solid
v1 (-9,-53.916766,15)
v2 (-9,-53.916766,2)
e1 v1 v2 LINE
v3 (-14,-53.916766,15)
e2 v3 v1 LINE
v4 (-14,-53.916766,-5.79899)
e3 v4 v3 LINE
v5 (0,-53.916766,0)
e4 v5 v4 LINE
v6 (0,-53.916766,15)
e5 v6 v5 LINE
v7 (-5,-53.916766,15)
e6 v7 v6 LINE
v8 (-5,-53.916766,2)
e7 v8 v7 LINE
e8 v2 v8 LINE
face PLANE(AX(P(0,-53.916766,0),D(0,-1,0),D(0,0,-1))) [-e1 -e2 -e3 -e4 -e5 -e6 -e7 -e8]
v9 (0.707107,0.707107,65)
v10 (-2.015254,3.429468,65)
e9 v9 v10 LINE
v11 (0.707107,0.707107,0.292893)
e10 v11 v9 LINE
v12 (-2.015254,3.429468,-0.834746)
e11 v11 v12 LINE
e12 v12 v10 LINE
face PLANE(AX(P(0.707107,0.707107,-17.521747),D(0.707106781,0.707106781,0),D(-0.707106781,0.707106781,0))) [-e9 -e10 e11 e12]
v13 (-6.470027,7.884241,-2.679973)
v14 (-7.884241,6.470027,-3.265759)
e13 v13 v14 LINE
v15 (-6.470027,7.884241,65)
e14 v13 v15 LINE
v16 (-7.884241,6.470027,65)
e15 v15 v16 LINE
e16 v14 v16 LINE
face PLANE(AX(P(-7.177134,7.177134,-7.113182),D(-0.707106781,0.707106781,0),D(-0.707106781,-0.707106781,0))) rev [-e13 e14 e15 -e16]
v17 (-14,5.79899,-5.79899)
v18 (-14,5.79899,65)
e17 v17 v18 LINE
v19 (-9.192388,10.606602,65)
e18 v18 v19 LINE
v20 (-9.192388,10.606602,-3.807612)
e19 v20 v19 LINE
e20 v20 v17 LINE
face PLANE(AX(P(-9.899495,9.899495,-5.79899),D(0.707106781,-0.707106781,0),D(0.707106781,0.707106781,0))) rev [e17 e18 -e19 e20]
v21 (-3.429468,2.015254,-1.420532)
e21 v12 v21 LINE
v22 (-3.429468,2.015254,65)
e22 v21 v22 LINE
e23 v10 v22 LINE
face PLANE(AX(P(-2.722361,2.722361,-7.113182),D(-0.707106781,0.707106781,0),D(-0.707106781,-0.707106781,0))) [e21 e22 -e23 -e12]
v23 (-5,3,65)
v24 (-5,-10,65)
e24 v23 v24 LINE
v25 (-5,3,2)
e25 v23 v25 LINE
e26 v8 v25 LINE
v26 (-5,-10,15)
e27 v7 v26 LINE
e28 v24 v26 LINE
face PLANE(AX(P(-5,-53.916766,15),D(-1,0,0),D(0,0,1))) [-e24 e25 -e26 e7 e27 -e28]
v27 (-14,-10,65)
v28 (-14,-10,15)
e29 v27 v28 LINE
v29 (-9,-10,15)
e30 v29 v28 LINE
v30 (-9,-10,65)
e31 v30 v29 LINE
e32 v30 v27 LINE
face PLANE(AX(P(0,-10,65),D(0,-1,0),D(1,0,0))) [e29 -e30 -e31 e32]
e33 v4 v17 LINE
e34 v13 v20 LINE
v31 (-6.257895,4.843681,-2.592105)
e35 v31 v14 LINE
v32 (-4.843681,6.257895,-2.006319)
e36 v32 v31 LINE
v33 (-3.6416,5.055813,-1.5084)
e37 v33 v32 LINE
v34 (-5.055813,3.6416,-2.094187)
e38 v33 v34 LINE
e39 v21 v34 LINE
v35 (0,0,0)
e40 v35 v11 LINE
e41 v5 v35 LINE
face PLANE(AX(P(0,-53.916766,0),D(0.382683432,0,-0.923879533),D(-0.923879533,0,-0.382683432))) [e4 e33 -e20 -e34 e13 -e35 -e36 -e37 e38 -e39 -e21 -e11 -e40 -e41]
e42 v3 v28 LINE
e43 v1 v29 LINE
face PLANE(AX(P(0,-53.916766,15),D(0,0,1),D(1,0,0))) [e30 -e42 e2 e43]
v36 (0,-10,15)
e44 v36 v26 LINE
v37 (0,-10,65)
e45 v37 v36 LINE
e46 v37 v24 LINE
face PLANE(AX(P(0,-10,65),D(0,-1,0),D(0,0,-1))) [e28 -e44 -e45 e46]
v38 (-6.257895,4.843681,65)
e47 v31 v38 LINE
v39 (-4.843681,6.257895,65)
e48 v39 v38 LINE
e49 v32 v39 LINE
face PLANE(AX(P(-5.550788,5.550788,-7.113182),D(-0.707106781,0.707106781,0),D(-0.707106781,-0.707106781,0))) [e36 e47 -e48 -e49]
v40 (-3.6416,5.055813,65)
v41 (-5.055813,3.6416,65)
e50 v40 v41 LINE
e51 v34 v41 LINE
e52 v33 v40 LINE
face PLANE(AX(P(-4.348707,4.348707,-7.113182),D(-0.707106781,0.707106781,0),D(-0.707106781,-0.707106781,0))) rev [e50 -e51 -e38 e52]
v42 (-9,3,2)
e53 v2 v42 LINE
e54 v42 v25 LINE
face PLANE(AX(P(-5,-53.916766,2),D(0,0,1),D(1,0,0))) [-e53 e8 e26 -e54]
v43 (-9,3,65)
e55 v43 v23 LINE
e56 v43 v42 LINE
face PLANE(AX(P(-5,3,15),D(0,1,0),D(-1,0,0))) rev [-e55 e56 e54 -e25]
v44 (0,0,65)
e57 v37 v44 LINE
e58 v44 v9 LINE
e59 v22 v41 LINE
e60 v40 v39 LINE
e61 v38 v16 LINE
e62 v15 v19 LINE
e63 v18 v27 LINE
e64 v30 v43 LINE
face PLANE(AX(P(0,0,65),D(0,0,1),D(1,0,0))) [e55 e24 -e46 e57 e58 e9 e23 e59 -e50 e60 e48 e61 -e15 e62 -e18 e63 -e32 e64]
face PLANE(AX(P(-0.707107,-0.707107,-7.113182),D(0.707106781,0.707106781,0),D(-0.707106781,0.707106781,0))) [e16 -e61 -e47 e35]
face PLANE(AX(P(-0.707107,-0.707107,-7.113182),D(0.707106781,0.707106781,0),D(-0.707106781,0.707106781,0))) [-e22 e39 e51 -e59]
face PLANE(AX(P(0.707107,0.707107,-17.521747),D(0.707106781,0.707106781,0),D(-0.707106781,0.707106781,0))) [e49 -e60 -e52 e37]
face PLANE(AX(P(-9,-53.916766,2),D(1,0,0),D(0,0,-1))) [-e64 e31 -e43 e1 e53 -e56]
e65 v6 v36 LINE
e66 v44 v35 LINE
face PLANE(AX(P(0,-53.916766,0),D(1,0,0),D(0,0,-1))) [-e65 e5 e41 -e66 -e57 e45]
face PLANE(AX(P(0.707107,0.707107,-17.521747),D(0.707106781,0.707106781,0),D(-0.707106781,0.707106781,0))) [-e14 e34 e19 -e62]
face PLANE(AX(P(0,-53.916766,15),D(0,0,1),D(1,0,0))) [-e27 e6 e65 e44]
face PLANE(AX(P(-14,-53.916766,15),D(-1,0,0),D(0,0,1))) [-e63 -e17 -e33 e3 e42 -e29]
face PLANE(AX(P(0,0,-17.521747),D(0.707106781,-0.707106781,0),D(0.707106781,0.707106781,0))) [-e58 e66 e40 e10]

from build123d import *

# Parameters (mm, degrees)
BOSS_EXTRUDE2_START       = -53.9167663
BOSS_EXTRUDE2_DEPTH       = 53.9167663
BOSS_EXTRUDE2_START_2     = -5.234980118
BOSS_EXTRUDE2_2_DEPTH     = 20.234980118
BOSS_EXTRUDE2_START_3     = -5.798989873
BOSS_EXTRUDE2_3_DEPTH     = 2.136888219
BOSS_EXTRUDE2_4_OUTLINE_W = 4
BOSS_EXTRUDE2_4_OUTLINE_H = 13
BOSS_EXTRUDE2_4_DEPTH     = 15
BOSS_EXTRUDE3_DEPTH       = 13
BOSS_EXTRUDE4_DEPTH       = 50
CUT_EXTRUDE2_DEPTH        = 91.086151296
BOSS_EXTRUDE12_REACH      = 92.086
CUT_EXTRUDE6_REACH        = 92.086


with BuildPart() as part:
    # Boss-Extrude2: read off the stored shape, not the designer's step
    # Boss-Extrude2 outline → Boss-Extrude2 (new body)
    with BuildSketch(Plane(origin=(0, 0, 0), x_dir=(1, 0, 0), z_dir=(0, 1, 0)).offset(BOSS_EXTRUDE2_START)):
        Polygon((0, -15), (0, 0), (-14, 5.798989873), (-14, -15), (-9, -15), (-9, -2), (-5, -2), (-5, -15), align=None)
    extrude(amount=BOSS_EXTRUDE2_DEPTH)



with BuildPart() as body_2:
    # Boss-Extrude2 2 outline → Boss-Extrude2 2 (new body)
    with BuildSketch(Plane.XY.offset(BOSS_EXTRUDE2_START_2)):
        Polygon((-14, 0), (0, 0), (-14, 14), align=None)
    extrude(amount=BOSS_EXTRUDE2_2_DEPTH)


with BuildPart() as part_1:
    add(part.part)

    add(body_2.part)  # Boss-Extrude2 3 merges body 2
    # Boss-Extrude2 3 outline → Boss-Extrude2 3 (add)
    with BuildSketch(Plane.XY.offset(BOSS_EXTRUDE2_START_3)):
        Polygon((-14, 0), (-9, 0), (-9, 9), (-14, 14), align=None)
    extrude(amount=BOSS_EXTRUDE2_3_DEPTH)

    # Boss-Extrude2 4 outline → Boss-Extrude2 4 (cut)
    with BuildSketch(Plane(origin=(0, 0, 0), x_dir=(1, 0, 0), z_dir=(0, 1, 0))):
        Polygon((0, 5.234980118), (-9, 5.234980118), (-9, 5.798989873), (-14, 5.798989873), (0, 0), align=None)
        with Locations((-7, -8.5)):
            Rectangle(BOSS_EXTRUDE2_4_OUTLINE_W, BOSS_EXTRUDE2_4_OUTLINE_H)
    extrude(amount=BOSS_EXTRUDE2_4_DEPTH, mode=Mode.SUBTRACT)

    # Sketch4 → Boss-Extrude3 (add)
    with BuildSketch(Plane.XY.offset(2)):
        Polygon((-5, 5), (-5, 3), (-9, 3), (-9, 9), align=None)
    extrude(amount=BOSS_EXTRUDE3_DEPTH)

    # Sketch5 → Boss-Extrude4 (add)
    with BuildSketch(Plane.XY.offset(15)):
        Polygon((-9, -10), (-9, 3), (-5, 3), (-5, -10), (0, -10), (0, 0), (-14, 14), (-14, -10), align=None)
    extrude(amount=BOSS_EXTRUDE4_DEPTH)

    # Sketch11 → Cut-Extrude2 (cut, through all)
    with BuildSketch(Plane.XY.offset(65)):
        Polygon((-9.899494937, 9.899494937), (-14, 5.798989873), (-14, 14), align=None)
    extrude(amount=-CUT_EXTRUDE2_DEPTH, mode=Mode.SUBTRACT)

    # Boss-Extrude12: up to this plane
    boss_extrude12_end = Plane(origin=(0, -53.9167663, 0), z_dir=(0.38268343236508406, 0, -0.9238795325112893))
    # Sketch21 → Boss-Extrude12 (add, up to the surface)
    with BuildSketch(Plane.XY.offset(65), mode=Mode.PRIVATE) as boss_extrude12_sk1:
        Polygon((-9.899494937, 9.899494937), (-9.192388155, 10.606601718), (0.707106781, 0.707106781), (0, 0), align=None)
    boss_extrude12_tool1 = split(extrude(boss_extrude12_sk1.sketch, amount=-BOSS_EXTRUDE12_REACH, mode=Mode.PRIVATE), bisect_by=boss_extrude12_end, keep=Keep.BOTH, mode=Mode.PRIVATE)
    add(boss_extrude12_tool1.solids().sort_by_distance((-4.596194, 5.303301, 65))[0])

    # Cut-Extrude6: up to this plane
    cut_extrude6_end = Plane(origin=(0, -53.9167663, 0), z_dir=(0.38268343236508406, 0, -0.9238795325112893))
    # Sketch22 → Cut-Extrude6 (cut, up to the surface)
    with BuildSketch(Plane.XY.offset(65), mode=Mode.PRIVATE) as cut_extrude6_sk1:
        Polygon((-3.429467889, 2.015254326), (-2.015254326, 3.429467889), (-3.641599923, 5.055813485), (-5.055813485, 3.641599923), align=None)
    cut_extrude6_tool1 = split(extrude(cut_extrude6_sk1.sketch, amount=-CUT_EXTRUDE6_REACH, mode=Mode.PRIVATE), bisect_by=cut_extrude6_end, keep=Keep.BOTH, mode=Mode.PRIVATE)
    add(cut_extrude6_tool1.solids().sort_by_distance((-3.535534, 3.535534, 65))[0], mode=Mode.SUBTRACT)
    # Sketch22 → Cut-Extrude6 (cut, up to the surface)
    with BuildSketch(Plane.XY.offset(65), mode=Mode.PRIVATE) as cut_extrude6_sk2:
        Polygon((-6.257895014, 4.843681451), (-4.843681451, 6.257895014), (-6.470027048, 7.88424061), (-7.88424061, 6.470027048), align=None)
    cut_extrude6_tool2 = split(extrude(cut_extrude6_sk2.sketch, amount=-CUT_EXTRUDE6_REACH, mode=Mode.PRIVATE), bisect_by=cut_extrude6_end, keep=Keep.BOTH, mode=Mode.PRIVATE)
    add(cut_extrude6_tool2.solids().sort_by_distance((-6.363961, 6.363961, 65))[0], mode=Mode.SUBTRACT)


solid = part_1.part
